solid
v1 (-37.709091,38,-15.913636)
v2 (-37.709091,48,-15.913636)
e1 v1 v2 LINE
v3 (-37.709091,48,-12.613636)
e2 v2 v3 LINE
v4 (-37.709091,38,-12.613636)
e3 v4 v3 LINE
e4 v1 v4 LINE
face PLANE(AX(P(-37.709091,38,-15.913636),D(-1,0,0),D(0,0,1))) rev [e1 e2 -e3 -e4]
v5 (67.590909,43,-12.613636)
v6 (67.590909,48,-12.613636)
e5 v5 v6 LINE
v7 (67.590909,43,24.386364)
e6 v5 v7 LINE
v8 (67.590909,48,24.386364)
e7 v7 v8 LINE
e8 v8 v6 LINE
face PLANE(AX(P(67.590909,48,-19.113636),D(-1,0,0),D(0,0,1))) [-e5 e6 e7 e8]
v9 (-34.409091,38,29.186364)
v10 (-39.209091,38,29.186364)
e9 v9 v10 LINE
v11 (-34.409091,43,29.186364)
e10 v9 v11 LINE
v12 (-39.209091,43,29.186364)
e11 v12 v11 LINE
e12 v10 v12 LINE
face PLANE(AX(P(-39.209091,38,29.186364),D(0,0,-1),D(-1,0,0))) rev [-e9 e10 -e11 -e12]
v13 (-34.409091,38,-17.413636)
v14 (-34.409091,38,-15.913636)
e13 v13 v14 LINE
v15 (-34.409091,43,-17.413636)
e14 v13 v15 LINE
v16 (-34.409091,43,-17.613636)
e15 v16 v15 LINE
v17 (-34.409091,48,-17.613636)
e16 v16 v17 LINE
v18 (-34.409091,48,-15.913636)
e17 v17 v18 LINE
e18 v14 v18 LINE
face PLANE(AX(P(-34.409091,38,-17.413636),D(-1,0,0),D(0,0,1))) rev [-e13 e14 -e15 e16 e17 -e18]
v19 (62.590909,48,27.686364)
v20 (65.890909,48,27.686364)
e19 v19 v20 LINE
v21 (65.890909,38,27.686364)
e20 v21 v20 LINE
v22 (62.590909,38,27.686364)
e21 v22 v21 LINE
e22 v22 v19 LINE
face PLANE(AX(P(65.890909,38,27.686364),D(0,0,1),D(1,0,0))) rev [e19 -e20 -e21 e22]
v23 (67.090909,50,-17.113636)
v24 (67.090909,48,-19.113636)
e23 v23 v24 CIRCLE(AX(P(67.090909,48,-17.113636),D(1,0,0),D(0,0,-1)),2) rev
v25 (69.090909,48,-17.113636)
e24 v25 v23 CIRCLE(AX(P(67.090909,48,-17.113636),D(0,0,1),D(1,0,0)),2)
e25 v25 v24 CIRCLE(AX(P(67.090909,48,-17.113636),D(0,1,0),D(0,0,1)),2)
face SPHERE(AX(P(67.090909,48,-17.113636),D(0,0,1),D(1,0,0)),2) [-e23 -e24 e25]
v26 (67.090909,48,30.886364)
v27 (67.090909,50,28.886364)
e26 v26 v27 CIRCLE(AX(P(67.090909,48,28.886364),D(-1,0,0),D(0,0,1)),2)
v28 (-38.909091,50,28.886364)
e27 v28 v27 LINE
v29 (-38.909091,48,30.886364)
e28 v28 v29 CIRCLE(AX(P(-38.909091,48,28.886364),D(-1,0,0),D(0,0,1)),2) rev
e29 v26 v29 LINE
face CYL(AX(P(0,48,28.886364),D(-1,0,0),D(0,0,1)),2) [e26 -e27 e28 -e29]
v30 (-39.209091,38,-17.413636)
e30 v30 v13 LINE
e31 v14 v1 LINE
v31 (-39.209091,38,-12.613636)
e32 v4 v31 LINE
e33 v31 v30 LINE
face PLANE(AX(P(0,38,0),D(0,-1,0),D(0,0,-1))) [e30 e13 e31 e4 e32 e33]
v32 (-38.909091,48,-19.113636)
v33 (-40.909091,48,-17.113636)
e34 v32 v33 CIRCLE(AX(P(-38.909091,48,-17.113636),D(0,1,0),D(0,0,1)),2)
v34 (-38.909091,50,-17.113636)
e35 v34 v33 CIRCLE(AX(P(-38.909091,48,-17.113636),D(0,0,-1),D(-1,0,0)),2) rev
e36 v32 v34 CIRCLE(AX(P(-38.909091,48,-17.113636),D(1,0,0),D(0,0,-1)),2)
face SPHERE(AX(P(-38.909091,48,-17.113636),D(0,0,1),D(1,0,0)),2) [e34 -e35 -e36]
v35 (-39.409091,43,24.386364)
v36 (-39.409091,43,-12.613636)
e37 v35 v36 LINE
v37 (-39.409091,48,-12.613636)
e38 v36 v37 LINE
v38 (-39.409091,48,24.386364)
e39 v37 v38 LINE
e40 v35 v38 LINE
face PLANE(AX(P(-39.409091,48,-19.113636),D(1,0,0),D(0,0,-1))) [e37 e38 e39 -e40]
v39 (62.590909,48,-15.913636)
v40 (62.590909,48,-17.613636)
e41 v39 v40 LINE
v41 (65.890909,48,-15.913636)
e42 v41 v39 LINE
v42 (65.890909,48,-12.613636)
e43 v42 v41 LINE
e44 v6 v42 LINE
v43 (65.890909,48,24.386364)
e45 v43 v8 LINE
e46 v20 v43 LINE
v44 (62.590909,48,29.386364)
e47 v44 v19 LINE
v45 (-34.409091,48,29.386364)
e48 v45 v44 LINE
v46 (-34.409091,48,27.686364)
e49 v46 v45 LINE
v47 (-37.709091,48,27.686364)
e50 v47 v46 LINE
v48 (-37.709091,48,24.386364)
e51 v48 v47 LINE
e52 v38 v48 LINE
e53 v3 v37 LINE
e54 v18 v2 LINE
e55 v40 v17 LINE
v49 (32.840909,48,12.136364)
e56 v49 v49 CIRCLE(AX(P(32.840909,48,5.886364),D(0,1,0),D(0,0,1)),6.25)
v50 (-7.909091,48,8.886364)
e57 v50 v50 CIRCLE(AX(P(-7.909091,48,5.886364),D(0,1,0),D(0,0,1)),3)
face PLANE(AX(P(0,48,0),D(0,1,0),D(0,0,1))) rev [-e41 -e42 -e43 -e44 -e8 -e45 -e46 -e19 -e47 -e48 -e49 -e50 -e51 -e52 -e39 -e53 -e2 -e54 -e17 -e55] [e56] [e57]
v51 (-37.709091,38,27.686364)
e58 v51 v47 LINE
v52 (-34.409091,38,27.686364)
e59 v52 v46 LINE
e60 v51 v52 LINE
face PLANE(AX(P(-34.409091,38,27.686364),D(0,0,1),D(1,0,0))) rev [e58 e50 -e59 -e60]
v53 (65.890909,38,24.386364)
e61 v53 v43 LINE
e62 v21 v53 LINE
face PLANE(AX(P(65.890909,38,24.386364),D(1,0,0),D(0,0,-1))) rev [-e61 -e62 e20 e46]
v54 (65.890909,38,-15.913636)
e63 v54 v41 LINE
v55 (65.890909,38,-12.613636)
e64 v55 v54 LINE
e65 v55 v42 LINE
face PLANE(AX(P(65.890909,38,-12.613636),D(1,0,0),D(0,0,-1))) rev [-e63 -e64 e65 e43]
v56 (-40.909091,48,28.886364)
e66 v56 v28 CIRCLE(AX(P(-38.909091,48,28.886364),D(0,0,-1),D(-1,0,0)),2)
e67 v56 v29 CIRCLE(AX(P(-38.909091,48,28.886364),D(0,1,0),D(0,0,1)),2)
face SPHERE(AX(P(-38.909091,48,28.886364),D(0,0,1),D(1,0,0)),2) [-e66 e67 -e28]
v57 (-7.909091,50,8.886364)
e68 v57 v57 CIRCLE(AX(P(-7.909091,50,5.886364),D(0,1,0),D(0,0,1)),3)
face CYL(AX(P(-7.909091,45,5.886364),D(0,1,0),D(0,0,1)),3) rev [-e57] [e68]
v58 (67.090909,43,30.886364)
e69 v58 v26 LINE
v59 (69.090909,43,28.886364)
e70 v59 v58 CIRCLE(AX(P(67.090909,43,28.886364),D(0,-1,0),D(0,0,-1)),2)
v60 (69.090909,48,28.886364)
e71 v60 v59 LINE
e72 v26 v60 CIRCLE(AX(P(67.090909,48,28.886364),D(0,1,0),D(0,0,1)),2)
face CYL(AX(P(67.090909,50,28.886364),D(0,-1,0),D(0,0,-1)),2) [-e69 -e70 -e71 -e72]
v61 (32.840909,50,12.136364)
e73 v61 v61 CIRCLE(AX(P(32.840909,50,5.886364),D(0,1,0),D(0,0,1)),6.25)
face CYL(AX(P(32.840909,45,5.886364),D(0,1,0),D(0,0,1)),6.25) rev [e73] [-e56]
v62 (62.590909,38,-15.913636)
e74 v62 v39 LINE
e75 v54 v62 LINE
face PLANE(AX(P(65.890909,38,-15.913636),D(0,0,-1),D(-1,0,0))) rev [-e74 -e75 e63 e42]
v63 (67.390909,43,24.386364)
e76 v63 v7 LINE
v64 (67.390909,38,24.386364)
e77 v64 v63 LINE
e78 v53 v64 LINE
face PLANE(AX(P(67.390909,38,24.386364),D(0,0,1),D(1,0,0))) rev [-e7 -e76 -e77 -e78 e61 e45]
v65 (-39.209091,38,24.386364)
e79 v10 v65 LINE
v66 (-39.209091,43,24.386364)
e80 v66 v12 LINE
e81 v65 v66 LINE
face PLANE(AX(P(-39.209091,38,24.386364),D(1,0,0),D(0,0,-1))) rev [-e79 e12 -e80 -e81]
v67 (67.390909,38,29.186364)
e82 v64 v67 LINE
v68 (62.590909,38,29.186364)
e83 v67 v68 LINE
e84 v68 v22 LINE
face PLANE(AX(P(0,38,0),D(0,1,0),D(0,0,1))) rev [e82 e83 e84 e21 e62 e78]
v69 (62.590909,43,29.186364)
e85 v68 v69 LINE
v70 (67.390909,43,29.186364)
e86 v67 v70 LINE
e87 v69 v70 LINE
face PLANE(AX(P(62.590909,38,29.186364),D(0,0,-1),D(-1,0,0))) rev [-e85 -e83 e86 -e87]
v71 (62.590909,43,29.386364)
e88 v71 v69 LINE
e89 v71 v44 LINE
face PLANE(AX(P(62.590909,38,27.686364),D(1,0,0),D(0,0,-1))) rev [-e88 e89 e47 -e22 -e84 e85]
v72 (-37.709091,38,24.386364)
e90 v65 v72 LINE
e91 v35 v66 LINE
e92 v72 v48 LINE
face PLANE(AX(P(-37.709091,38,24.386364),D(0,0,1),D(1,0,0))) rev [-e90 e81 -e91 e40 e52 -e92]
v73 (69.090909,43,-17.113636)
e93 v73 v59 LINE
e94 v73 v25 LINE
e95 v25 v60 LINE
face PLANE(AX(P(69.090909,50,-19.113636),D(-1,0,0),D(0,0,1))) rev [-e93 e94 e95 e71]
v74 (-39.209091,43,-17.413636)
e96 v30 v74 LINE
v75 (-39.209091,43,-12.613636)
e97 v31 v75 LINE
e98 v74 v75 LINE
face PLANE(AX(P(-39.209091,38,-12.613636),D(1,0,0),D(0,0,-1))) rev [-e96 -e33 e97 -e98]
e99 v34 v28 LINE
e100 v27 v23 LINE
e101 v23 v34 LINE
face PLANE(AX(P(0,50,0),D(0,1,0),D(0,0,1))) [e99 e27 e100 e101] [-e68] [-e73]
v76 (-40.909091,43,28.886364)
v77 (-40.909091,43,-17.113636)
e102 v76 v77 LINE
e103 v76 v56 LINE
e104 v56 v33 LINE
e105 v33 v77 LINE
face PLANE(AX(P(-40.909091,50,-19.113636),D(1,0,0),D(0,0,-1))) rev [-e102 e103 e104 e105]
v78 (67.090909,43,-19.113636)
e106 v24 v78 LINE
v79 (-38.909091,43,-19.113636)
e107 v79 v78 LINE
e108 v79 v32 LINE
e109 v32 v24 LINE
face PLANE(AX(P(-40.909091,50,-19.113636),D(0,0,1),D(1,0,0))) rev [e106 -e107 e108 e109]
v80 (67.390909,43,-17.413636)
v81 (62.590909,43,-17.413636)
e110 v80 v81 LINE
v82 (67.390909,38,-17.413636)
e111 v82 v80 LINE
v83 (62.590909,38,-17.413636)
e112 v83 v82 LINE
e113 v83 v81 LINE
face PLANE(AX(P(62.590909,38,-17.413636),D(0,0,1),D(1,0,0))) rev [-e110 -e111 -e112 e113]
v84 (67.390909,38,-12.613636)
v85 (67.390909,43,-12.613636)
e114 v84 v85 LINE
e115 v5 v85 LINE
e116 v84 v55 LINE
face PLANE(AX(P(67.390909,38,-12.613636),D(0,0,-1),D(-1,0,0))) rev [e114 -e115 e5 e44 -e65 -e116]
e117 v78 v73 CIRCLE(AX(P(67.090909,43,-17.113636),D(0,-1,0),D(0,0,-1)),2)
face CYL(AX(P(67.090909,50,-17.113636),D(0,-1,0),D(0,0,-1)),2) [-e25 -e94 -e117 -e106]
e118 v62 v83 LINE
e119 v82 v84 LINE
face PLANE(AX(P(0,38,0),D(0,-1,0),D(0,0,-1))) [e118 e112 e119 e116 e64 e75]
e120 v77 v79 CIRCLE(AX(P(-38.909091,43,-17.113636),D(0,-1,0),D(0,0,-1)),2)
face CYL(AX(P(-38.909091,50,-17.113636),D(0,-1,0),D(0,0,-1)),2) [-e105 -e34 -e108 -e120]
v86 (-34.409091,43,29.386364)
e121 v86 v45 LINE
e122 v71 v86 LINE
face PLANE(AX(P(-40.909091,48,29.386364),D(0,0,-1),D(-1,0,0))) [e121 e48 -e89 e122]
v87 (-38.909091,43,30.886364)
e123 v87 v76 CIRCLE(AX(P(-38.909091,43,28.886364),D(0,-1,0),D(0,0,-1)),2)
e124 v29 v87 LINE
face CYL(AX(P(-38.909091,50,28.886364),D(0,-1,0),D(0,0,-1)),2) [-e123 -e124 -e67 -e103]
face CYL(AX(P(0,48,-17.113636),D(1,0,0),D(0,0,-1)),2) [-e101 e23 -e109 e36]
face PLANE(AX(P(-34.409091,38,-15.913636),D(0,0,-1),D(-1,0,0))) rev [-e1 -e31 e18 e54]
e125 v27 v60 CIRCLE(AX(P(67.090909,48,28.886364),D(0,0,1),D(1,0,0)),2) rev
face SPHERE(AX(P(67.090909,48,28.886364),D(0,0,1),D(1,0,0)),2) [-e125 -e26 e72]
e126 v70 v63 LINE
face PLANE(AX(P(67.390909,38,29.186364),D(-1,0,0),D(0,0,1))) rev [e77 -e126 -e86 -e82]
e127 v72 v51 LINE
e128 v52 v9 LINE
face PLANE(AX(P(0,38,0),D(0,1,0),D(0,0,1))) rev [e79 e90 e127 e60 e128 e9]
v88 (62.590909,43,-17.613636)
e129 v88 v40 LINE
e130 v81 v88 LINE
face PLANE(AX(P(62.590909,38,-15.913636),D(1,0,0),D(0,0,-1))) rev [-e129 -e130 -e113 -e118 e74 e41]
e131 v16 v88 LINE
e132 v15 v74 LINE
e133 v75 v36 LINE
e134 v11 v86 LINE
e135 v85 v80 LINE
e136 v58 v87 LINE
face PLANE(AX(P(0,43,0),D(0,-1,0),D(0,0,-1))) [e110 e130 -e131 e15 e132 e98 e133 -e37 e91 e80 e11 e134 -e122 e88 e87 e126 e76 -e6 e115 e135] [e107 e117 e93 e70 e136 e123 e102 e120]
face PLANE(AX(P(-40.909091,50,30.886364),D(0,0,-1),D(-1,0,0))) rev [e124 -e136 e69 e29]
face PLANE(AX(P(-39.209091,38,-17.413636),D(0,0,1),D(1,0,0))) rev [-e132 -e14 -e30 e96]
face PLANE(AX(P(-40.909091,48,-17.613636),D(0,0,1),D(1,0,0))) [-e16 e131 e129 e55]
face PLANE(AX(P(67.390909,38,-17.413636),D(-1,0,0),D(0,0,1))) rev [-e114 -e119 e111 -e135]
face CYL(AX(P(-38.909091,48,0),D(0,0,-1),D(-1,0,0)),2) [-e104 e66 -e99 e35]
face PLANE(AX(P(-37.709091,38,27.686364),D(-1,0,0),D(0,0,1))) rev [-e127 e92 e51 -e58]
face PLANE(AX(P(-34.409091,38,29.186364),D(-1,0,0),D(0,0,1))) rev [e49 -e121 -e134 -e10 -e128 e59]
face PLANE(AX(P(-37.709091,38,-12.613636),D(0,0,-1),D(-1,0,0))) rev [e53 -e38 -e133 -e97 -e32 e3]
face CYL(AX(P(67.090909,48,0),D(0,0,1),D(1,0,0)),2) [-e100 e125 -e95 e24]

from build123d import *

# Parameters (mm, degrees)
STOCK_FULL_START                 = 48
STOCK_FULL_SHAPE_1_OUTLINE_W     = 110
STOCK_FULL_SHAPE_1_OUTLINE_H     = 50
STOCK_FULL_SHAPE_1_DEPTH         = 2
STOCK_FULL_START_2               = 45
STOCK_FULL_SHAPE_1_2_OUTLINE_W   = 110
STOCK_FULL_SHAPE_1_2_OUTLINE_H   = 50
STOCK_FULL_SHAPE_1_2_OUTLINE_W_2 = 107
STOCK_FULL_SHAPE_1_2_OUTLINE_H_2 = 47
STOCK_FULL_SHAPE_1_2_DEPTH       = 3
SKETCH1_W                        = 110
SKETCH1_H                        = 50
SKETCH1_W_2                      = 107
SKETCH1_H_2                      = 47
BOSS_EXTRUDE1_DEPTH              = 2
BOSS_EXTRUDE2_DEPTH              = 10
BOSS_EXTRUDE3_DEPTH              = 5
SKETCH6_R                        = 6.25
SKETCH6_R_2                      = 3
CUT_EXTRUDE1_DEPTH               = 5
FILLET1_R                        = 2
FILLET2_R                        = 2


# Read off the part's stored shape, not the designer's step: Stock-full shape-1
with BuildPart() as part:
    # Stock-full shape-1 outline → Stock-full shape-1 (new body)
    with BuildSketch(Plane(origin=(0, 0, 0), x_dir=(1, 0, 0), z_dir=(0, 1, 0)).offset(STOCK_FULL_START)):
        with Locations((14.090909091, -5.886363636)):
            Rectangle(STOCK_FULL_SHAPE_1_OUTLINE_W, STOCK_FULL_SHAPE_1_OUTLINE_H)
    extrude(amount=STOCK_FULL_SHAPE_1_DEPTH)

    # Stock-full shape-1 2 outline → Stock-full shape-1 2 (add)
    with BuildSketch(Plane(origin=(0, 0, 0), x_dir=(1, 0, 0), z_dir=(0, 1, 0)).offset(STOCK_FULL_START_2)):
        with Locations((14.090909091, -5.886363636)):
            Rectangle(STOCK_FULL_SHAPE_1_2_OUTLINE_W, STOCK_FULL_SHAPE_1_2_OUTLINE_H)
        with Locations((14.090909091, -5.886363636)):
            Rectangle(STOCK_FULL_SHAPE_1_2_OUTLINE_W_2, STOCK_FULL_SHAPE_1_2_OUTLINE_H_2, mode=Mode.SUBTRACT)
    extrude(amount=STOCK_FULL_SHAPE_1_2_DEPTH)

    # Sketch1 → Boss-Extrude1 (add)
    with BuildSketch(Plane(origin=(0, 45, 0), x_dir=(-1, 0, 0), z_dir=(0, -1, 0))):
        with Locations((-14.090909091, -5.886363636)):
            Rectangle(SKETCH1_W, SKETCH1_H)
        with Locations((-14.090909091, -5.886363636)):
            Rectangle(SKETCH1_W_2, SKETCH1_H_2, mode=Mode.SUBTRACT)
    extrude(amount=BOSS_EXTRUDE1_DEPTH)

    # Sketch3 → Boss-Extrude2 (add)
    with BuildSketch(Plane.XZ.offset(-48)):
        Polygon((-39.209090909, 24.386363636), (-39.209090909, 29.186363636), (-34.409090909, 29.186363636), (-34.409090909, 27.686363636), (-37.709090909, 27.686363636), (-37.709090909, 24.386363636), align=None)
        Polygon((62.590909091, 29.186363636), (67.390909091, 29.186363636), (67.390909091, 24.386363636), (65.890909091, 24.386363636), (65.890909091, 27.686363636), (62.590909091, 27.686363636), align=None)
        Polygon((67.390909091, -12.613636364), (65.890909091, -12.613636364), (65.890909091, -15.913636364), (62.590909091, -15.913636364), (62.590909091, -17.413636364), (67.390909091, -17.413636364), align=None)
        Polygon((-39.209090909, -12.613636364), (-39.209090909, -17.413636364), (-34.409090909, -17.413636364), (-34.409090909, -15.913636364), (-37.709090909, -15.913636364), (-37.709090909, -12.613636364), align=None)
    extrude(amount=BOSS_EXTRUDE2_DEPTH)

    # Sketch5 → Boss-Extrude3 (add)
    with BuildSketch(Plane.XZ.offset(-48)):
        Polygon((-39.209090909, -12.613636364), (-39.209090909, -17.413636364), (-34.409090909, -17.413636364), (-34.409090909, -17.613636364), (-39.409090909, -17.613636364), (-39.409090909, -12.613636364), align=None)
        Polygon((-39.409090909, 24.386363636), (-39.209090909, 24.386363636), (-39.209090909, 29.186363636), (-34.409090909, 29.186363636), (-34.409090909, 29.386363636), (-39.409090909, 29.386363636), align=None)
        Polygon((67.590909091, 24.386363636), (67.390909091, 24.386363636), (67.390909091, 29.186363636), (62.590909091, 29.186363636), (62.590909091, 29.386363636), (67.590909091, 29.386363636), align=None)
        Polygon((67.390909091, -17.413636364), (67.390909091, -12.613636364), (67.590909091, -12.613636364), (67.590909091, -17.613636364), (62.590909091, -17.613636364), (62.590909091, -17.413636364), align=None)
    extrude(amount=BOSS_EXTRUDE3_DEPTH)

    # Sketch6 → Cut-Extrude1 (cut)
    with BuildSketch(Plane(origin=(0, 50, 0), x_dir=(1, 0, 0), z_dir=(0, 1, 0))):
        with Locations(Location((32.840909091, -5.886363636, 0), (0, 0, 270))):
            Circle(SKETCH6_R)
        with Locations(Location((-7.909090909, -5.886363636, 0), (0, 0, 270))):
            Circle(SKETCH6_R_2)
    extrude(amount=-CUT_EXTRUDE1_DEPTH, mode=Mode.SUBTRACT)

    # Fillet1
    fillet1_edges = [part.edges().sort_by_distance(p)[0] for p in [
        (-40.909090909, 50, 5.886363636),
        (14.090909091, 50, 30.886363636),
        (69.090909091, 50, 5.886363636),
        (14.090909091, 50, -19.113636364),
    ]]
    fillet(fillet1_edges, radius=FILLET1_R)

    # Fillet2
    # the kernel refuses this fillet: 2 mm, written as the material it takes off along each edge
    with BuildSketch(Plane(origin=(-38.909090909, 48, 28.886363636), x_dir=(0, 0, 1), z_dir=(-1, 0, 0))) as fillet2_piece_1_section:
        Polygon((0, 0), (FILLET2_R, 0), (FILLET2_R, FILLET2_R), (0, FILLET2_R), align=None)
    fillet2_piece_1 = extrude(amount=FILLET2_R, mode=Mode.PRIVATE)
    fillet2_piece_1 = fillet2_piece_1 - Plane(origin=(-38.909090909, 48, 28.886363636), x_dir=(0, -0.7071067811865475, -0.7071067811865475), z_dir=(-1, 0, 0)) * Sphere(FILLET2_R, mode=Mode.PRIVATE)
    add(fillet2_piece_1, mode=Mode.SUBTRACT)
    with BuildSketch(Plane(origin=(-38.909090909, 48, -17.113636364), x_dir=(0, 0, -1), z_dir=(-1, 0, 0))) as fillet2_piece_2_section:
        Polygon((0, 0), (FILLET2_R, 0), (FILLET2_R, -FILLET2_R), (0, -FILLET2_R), align=None)
    fillet2_piece_2 = extrude(amount=FILLET2_R, mode=Mode.PRIVATE)
    fillet2_piece_2 = fillet2_piece_2 - Plane(origin=(-38.909090909, 48, -17.113636364), x_dir=(0, -0.7071067811865475, 0.7071067811865475), z_dir=(-1, 0, 0)) * Sphere(FILLET2_R, mode=Mode.PRIVATE)
    add(fillet2_piece_2, mode=Mode.SUBTRACT)
    with BuildSketch(Plane(origin=(67.090909091, 48, 28.886363636), x_dir=(1, 0, 0), z_dir=(0, 0, 1))) as fillet2_piece_3_section:
        Polygon((0, 0), (FILLET2_R, 0), (FILLET2_R, FILLET2_R), (0, FILLET2_R), align=None)
    fillet2_piece_3 = extrude(amount=FILLET2_R, mode=Mode.PRIVATE)
    fillet2_piece_3 = fillet2_piece_3 - Plane(origin=(67.090909091, 48, 28.886363636), x_dir=(-0.7071067811865475, -0.7071067811865475, 0), z_dir=(0, 0, 1)) * Sphere(FILLET2_R, mode=Mode.PRIVATE)
    add(fillet2_piece_3, mode=Mode.SUBTRACT)
    with BuildSketch(Plane(origin=(67.090909091, 48, -17.113636364), x_dir=(1, 0, 0), z_dir=(0, 0, -1))) as fillet2_piece_4_section:
        Polygon((0, 0), (FILLET2_R, 0), (FILLET2_R, -FILLET2_R), (0, -FILLET2_R), align=None)
    fillet2_piece_4 = extrude(amount=FILLET2_R, mode=Mode.PRIVATE)
    fillet2_piece_4 = fillet2_piece_4 - Plane(origin=(67.090909091, 48, -17.113636364), x_dir=(-0.7071067811865475, -0.7071067811865475, 0), z_dir=(0, 0, -1)) * Sphere(FILLET2_R, mode=Mode.PRIVATE)
    add(fillet2_piece_4, mode=Mode.SUBTRACT)
    with BuildSketch(Plane(origin=(69.090909091, 45, 30.886363636), x_dir=(-1, 0, 0), z_dir=(0, 1, 0)), Plane(origin=(69.090909091, 48, -19.113636364), x_dir=(-1, 0, 0), z_dir=(0, -1, 0)), Plane(origin=(-40.909090909, 45, 30.886363636), x_dir=(0, 0, -1), z_dir=(0, 1, 0))) as fillet2_piece_5:
        with BuildLine():
            CenterArc((FILLET2_R, -FILLET2_R), FILLET2_R, 90, 90)
            Line((0, -FILLET2_R), (0, 0))
            Line((0, 0), (FILLET2_R, 0))
        make_face()
    extrude(amount=3, mode=Mode.SUBTRACT)
    with BuildSketch(Plane(origin=(-40.909090909, 48, -19.113636364), x_dir=(1.2985168496859017e-11, 5.194777941125234e-11, 1.0), z_dir=(-1.2986691087592473e-11, -1.0, 5.1947779411420976e-11))) as fillet2_piece_6:
        with BuildLine():
            CenterArc((FILLET2_R, -FILLET2_R), FILLET2_R, 90.000000001, 90)
            Line((0, -FILLET2_R), (0, 0))
            Line((0, 0), (FILLET2_R, 0))
        make_face()
    extrude(amount=10, mode=Mode.SUBTRACT)
    with BuildSketch(Plane(origin=(-40.909090909, 45, 30.886363636), x_dir=(4.545341879830931e-11, 0, -1.0), z_dir=(0, -1, 0)), Plane(origin=(69.090909091, 45, 30.886363636), x_dir=(-1.0, 0, -1.8181900430507692e-10), z_dir=(0, -1, 0))) as fillet2_piece_7:
        with BuildLine():
            CenterArc((FILLET2_R, FILLET2_R), FILLET2_R, 179.999999997, 90)
            Line((FILLET2_R * 2.27272423097e-10, FILLET2_R), (0, 0))
            Line((0, 0), (FILLET2_R, 0))
        make_face()
    extrude(amount=7.000000001, mode=Mode.SUBTRACT)
    with BuildSketch(Plane(origin=(69.090909091, 45, -19.113636364), x_dir=(-1.0, 0, -1.8181722794823744e-10), z_dir=(0, -1, 0))) as fillet2_piece_8:
        with BuildLine():
            CenterArc((FILLET2_R, -FILLET2_R), FILLET2_R, 89.99999999, 90)
            Line((-FILLET2_R * 2.27270646722e-10, -FILLET2_R), (0, 0))
            Line((0, 0), (FILLET2_R, 0))
        make_face()
    extrude(amount=7, mode=Mode.SUBTRACT)


solid = part.part
